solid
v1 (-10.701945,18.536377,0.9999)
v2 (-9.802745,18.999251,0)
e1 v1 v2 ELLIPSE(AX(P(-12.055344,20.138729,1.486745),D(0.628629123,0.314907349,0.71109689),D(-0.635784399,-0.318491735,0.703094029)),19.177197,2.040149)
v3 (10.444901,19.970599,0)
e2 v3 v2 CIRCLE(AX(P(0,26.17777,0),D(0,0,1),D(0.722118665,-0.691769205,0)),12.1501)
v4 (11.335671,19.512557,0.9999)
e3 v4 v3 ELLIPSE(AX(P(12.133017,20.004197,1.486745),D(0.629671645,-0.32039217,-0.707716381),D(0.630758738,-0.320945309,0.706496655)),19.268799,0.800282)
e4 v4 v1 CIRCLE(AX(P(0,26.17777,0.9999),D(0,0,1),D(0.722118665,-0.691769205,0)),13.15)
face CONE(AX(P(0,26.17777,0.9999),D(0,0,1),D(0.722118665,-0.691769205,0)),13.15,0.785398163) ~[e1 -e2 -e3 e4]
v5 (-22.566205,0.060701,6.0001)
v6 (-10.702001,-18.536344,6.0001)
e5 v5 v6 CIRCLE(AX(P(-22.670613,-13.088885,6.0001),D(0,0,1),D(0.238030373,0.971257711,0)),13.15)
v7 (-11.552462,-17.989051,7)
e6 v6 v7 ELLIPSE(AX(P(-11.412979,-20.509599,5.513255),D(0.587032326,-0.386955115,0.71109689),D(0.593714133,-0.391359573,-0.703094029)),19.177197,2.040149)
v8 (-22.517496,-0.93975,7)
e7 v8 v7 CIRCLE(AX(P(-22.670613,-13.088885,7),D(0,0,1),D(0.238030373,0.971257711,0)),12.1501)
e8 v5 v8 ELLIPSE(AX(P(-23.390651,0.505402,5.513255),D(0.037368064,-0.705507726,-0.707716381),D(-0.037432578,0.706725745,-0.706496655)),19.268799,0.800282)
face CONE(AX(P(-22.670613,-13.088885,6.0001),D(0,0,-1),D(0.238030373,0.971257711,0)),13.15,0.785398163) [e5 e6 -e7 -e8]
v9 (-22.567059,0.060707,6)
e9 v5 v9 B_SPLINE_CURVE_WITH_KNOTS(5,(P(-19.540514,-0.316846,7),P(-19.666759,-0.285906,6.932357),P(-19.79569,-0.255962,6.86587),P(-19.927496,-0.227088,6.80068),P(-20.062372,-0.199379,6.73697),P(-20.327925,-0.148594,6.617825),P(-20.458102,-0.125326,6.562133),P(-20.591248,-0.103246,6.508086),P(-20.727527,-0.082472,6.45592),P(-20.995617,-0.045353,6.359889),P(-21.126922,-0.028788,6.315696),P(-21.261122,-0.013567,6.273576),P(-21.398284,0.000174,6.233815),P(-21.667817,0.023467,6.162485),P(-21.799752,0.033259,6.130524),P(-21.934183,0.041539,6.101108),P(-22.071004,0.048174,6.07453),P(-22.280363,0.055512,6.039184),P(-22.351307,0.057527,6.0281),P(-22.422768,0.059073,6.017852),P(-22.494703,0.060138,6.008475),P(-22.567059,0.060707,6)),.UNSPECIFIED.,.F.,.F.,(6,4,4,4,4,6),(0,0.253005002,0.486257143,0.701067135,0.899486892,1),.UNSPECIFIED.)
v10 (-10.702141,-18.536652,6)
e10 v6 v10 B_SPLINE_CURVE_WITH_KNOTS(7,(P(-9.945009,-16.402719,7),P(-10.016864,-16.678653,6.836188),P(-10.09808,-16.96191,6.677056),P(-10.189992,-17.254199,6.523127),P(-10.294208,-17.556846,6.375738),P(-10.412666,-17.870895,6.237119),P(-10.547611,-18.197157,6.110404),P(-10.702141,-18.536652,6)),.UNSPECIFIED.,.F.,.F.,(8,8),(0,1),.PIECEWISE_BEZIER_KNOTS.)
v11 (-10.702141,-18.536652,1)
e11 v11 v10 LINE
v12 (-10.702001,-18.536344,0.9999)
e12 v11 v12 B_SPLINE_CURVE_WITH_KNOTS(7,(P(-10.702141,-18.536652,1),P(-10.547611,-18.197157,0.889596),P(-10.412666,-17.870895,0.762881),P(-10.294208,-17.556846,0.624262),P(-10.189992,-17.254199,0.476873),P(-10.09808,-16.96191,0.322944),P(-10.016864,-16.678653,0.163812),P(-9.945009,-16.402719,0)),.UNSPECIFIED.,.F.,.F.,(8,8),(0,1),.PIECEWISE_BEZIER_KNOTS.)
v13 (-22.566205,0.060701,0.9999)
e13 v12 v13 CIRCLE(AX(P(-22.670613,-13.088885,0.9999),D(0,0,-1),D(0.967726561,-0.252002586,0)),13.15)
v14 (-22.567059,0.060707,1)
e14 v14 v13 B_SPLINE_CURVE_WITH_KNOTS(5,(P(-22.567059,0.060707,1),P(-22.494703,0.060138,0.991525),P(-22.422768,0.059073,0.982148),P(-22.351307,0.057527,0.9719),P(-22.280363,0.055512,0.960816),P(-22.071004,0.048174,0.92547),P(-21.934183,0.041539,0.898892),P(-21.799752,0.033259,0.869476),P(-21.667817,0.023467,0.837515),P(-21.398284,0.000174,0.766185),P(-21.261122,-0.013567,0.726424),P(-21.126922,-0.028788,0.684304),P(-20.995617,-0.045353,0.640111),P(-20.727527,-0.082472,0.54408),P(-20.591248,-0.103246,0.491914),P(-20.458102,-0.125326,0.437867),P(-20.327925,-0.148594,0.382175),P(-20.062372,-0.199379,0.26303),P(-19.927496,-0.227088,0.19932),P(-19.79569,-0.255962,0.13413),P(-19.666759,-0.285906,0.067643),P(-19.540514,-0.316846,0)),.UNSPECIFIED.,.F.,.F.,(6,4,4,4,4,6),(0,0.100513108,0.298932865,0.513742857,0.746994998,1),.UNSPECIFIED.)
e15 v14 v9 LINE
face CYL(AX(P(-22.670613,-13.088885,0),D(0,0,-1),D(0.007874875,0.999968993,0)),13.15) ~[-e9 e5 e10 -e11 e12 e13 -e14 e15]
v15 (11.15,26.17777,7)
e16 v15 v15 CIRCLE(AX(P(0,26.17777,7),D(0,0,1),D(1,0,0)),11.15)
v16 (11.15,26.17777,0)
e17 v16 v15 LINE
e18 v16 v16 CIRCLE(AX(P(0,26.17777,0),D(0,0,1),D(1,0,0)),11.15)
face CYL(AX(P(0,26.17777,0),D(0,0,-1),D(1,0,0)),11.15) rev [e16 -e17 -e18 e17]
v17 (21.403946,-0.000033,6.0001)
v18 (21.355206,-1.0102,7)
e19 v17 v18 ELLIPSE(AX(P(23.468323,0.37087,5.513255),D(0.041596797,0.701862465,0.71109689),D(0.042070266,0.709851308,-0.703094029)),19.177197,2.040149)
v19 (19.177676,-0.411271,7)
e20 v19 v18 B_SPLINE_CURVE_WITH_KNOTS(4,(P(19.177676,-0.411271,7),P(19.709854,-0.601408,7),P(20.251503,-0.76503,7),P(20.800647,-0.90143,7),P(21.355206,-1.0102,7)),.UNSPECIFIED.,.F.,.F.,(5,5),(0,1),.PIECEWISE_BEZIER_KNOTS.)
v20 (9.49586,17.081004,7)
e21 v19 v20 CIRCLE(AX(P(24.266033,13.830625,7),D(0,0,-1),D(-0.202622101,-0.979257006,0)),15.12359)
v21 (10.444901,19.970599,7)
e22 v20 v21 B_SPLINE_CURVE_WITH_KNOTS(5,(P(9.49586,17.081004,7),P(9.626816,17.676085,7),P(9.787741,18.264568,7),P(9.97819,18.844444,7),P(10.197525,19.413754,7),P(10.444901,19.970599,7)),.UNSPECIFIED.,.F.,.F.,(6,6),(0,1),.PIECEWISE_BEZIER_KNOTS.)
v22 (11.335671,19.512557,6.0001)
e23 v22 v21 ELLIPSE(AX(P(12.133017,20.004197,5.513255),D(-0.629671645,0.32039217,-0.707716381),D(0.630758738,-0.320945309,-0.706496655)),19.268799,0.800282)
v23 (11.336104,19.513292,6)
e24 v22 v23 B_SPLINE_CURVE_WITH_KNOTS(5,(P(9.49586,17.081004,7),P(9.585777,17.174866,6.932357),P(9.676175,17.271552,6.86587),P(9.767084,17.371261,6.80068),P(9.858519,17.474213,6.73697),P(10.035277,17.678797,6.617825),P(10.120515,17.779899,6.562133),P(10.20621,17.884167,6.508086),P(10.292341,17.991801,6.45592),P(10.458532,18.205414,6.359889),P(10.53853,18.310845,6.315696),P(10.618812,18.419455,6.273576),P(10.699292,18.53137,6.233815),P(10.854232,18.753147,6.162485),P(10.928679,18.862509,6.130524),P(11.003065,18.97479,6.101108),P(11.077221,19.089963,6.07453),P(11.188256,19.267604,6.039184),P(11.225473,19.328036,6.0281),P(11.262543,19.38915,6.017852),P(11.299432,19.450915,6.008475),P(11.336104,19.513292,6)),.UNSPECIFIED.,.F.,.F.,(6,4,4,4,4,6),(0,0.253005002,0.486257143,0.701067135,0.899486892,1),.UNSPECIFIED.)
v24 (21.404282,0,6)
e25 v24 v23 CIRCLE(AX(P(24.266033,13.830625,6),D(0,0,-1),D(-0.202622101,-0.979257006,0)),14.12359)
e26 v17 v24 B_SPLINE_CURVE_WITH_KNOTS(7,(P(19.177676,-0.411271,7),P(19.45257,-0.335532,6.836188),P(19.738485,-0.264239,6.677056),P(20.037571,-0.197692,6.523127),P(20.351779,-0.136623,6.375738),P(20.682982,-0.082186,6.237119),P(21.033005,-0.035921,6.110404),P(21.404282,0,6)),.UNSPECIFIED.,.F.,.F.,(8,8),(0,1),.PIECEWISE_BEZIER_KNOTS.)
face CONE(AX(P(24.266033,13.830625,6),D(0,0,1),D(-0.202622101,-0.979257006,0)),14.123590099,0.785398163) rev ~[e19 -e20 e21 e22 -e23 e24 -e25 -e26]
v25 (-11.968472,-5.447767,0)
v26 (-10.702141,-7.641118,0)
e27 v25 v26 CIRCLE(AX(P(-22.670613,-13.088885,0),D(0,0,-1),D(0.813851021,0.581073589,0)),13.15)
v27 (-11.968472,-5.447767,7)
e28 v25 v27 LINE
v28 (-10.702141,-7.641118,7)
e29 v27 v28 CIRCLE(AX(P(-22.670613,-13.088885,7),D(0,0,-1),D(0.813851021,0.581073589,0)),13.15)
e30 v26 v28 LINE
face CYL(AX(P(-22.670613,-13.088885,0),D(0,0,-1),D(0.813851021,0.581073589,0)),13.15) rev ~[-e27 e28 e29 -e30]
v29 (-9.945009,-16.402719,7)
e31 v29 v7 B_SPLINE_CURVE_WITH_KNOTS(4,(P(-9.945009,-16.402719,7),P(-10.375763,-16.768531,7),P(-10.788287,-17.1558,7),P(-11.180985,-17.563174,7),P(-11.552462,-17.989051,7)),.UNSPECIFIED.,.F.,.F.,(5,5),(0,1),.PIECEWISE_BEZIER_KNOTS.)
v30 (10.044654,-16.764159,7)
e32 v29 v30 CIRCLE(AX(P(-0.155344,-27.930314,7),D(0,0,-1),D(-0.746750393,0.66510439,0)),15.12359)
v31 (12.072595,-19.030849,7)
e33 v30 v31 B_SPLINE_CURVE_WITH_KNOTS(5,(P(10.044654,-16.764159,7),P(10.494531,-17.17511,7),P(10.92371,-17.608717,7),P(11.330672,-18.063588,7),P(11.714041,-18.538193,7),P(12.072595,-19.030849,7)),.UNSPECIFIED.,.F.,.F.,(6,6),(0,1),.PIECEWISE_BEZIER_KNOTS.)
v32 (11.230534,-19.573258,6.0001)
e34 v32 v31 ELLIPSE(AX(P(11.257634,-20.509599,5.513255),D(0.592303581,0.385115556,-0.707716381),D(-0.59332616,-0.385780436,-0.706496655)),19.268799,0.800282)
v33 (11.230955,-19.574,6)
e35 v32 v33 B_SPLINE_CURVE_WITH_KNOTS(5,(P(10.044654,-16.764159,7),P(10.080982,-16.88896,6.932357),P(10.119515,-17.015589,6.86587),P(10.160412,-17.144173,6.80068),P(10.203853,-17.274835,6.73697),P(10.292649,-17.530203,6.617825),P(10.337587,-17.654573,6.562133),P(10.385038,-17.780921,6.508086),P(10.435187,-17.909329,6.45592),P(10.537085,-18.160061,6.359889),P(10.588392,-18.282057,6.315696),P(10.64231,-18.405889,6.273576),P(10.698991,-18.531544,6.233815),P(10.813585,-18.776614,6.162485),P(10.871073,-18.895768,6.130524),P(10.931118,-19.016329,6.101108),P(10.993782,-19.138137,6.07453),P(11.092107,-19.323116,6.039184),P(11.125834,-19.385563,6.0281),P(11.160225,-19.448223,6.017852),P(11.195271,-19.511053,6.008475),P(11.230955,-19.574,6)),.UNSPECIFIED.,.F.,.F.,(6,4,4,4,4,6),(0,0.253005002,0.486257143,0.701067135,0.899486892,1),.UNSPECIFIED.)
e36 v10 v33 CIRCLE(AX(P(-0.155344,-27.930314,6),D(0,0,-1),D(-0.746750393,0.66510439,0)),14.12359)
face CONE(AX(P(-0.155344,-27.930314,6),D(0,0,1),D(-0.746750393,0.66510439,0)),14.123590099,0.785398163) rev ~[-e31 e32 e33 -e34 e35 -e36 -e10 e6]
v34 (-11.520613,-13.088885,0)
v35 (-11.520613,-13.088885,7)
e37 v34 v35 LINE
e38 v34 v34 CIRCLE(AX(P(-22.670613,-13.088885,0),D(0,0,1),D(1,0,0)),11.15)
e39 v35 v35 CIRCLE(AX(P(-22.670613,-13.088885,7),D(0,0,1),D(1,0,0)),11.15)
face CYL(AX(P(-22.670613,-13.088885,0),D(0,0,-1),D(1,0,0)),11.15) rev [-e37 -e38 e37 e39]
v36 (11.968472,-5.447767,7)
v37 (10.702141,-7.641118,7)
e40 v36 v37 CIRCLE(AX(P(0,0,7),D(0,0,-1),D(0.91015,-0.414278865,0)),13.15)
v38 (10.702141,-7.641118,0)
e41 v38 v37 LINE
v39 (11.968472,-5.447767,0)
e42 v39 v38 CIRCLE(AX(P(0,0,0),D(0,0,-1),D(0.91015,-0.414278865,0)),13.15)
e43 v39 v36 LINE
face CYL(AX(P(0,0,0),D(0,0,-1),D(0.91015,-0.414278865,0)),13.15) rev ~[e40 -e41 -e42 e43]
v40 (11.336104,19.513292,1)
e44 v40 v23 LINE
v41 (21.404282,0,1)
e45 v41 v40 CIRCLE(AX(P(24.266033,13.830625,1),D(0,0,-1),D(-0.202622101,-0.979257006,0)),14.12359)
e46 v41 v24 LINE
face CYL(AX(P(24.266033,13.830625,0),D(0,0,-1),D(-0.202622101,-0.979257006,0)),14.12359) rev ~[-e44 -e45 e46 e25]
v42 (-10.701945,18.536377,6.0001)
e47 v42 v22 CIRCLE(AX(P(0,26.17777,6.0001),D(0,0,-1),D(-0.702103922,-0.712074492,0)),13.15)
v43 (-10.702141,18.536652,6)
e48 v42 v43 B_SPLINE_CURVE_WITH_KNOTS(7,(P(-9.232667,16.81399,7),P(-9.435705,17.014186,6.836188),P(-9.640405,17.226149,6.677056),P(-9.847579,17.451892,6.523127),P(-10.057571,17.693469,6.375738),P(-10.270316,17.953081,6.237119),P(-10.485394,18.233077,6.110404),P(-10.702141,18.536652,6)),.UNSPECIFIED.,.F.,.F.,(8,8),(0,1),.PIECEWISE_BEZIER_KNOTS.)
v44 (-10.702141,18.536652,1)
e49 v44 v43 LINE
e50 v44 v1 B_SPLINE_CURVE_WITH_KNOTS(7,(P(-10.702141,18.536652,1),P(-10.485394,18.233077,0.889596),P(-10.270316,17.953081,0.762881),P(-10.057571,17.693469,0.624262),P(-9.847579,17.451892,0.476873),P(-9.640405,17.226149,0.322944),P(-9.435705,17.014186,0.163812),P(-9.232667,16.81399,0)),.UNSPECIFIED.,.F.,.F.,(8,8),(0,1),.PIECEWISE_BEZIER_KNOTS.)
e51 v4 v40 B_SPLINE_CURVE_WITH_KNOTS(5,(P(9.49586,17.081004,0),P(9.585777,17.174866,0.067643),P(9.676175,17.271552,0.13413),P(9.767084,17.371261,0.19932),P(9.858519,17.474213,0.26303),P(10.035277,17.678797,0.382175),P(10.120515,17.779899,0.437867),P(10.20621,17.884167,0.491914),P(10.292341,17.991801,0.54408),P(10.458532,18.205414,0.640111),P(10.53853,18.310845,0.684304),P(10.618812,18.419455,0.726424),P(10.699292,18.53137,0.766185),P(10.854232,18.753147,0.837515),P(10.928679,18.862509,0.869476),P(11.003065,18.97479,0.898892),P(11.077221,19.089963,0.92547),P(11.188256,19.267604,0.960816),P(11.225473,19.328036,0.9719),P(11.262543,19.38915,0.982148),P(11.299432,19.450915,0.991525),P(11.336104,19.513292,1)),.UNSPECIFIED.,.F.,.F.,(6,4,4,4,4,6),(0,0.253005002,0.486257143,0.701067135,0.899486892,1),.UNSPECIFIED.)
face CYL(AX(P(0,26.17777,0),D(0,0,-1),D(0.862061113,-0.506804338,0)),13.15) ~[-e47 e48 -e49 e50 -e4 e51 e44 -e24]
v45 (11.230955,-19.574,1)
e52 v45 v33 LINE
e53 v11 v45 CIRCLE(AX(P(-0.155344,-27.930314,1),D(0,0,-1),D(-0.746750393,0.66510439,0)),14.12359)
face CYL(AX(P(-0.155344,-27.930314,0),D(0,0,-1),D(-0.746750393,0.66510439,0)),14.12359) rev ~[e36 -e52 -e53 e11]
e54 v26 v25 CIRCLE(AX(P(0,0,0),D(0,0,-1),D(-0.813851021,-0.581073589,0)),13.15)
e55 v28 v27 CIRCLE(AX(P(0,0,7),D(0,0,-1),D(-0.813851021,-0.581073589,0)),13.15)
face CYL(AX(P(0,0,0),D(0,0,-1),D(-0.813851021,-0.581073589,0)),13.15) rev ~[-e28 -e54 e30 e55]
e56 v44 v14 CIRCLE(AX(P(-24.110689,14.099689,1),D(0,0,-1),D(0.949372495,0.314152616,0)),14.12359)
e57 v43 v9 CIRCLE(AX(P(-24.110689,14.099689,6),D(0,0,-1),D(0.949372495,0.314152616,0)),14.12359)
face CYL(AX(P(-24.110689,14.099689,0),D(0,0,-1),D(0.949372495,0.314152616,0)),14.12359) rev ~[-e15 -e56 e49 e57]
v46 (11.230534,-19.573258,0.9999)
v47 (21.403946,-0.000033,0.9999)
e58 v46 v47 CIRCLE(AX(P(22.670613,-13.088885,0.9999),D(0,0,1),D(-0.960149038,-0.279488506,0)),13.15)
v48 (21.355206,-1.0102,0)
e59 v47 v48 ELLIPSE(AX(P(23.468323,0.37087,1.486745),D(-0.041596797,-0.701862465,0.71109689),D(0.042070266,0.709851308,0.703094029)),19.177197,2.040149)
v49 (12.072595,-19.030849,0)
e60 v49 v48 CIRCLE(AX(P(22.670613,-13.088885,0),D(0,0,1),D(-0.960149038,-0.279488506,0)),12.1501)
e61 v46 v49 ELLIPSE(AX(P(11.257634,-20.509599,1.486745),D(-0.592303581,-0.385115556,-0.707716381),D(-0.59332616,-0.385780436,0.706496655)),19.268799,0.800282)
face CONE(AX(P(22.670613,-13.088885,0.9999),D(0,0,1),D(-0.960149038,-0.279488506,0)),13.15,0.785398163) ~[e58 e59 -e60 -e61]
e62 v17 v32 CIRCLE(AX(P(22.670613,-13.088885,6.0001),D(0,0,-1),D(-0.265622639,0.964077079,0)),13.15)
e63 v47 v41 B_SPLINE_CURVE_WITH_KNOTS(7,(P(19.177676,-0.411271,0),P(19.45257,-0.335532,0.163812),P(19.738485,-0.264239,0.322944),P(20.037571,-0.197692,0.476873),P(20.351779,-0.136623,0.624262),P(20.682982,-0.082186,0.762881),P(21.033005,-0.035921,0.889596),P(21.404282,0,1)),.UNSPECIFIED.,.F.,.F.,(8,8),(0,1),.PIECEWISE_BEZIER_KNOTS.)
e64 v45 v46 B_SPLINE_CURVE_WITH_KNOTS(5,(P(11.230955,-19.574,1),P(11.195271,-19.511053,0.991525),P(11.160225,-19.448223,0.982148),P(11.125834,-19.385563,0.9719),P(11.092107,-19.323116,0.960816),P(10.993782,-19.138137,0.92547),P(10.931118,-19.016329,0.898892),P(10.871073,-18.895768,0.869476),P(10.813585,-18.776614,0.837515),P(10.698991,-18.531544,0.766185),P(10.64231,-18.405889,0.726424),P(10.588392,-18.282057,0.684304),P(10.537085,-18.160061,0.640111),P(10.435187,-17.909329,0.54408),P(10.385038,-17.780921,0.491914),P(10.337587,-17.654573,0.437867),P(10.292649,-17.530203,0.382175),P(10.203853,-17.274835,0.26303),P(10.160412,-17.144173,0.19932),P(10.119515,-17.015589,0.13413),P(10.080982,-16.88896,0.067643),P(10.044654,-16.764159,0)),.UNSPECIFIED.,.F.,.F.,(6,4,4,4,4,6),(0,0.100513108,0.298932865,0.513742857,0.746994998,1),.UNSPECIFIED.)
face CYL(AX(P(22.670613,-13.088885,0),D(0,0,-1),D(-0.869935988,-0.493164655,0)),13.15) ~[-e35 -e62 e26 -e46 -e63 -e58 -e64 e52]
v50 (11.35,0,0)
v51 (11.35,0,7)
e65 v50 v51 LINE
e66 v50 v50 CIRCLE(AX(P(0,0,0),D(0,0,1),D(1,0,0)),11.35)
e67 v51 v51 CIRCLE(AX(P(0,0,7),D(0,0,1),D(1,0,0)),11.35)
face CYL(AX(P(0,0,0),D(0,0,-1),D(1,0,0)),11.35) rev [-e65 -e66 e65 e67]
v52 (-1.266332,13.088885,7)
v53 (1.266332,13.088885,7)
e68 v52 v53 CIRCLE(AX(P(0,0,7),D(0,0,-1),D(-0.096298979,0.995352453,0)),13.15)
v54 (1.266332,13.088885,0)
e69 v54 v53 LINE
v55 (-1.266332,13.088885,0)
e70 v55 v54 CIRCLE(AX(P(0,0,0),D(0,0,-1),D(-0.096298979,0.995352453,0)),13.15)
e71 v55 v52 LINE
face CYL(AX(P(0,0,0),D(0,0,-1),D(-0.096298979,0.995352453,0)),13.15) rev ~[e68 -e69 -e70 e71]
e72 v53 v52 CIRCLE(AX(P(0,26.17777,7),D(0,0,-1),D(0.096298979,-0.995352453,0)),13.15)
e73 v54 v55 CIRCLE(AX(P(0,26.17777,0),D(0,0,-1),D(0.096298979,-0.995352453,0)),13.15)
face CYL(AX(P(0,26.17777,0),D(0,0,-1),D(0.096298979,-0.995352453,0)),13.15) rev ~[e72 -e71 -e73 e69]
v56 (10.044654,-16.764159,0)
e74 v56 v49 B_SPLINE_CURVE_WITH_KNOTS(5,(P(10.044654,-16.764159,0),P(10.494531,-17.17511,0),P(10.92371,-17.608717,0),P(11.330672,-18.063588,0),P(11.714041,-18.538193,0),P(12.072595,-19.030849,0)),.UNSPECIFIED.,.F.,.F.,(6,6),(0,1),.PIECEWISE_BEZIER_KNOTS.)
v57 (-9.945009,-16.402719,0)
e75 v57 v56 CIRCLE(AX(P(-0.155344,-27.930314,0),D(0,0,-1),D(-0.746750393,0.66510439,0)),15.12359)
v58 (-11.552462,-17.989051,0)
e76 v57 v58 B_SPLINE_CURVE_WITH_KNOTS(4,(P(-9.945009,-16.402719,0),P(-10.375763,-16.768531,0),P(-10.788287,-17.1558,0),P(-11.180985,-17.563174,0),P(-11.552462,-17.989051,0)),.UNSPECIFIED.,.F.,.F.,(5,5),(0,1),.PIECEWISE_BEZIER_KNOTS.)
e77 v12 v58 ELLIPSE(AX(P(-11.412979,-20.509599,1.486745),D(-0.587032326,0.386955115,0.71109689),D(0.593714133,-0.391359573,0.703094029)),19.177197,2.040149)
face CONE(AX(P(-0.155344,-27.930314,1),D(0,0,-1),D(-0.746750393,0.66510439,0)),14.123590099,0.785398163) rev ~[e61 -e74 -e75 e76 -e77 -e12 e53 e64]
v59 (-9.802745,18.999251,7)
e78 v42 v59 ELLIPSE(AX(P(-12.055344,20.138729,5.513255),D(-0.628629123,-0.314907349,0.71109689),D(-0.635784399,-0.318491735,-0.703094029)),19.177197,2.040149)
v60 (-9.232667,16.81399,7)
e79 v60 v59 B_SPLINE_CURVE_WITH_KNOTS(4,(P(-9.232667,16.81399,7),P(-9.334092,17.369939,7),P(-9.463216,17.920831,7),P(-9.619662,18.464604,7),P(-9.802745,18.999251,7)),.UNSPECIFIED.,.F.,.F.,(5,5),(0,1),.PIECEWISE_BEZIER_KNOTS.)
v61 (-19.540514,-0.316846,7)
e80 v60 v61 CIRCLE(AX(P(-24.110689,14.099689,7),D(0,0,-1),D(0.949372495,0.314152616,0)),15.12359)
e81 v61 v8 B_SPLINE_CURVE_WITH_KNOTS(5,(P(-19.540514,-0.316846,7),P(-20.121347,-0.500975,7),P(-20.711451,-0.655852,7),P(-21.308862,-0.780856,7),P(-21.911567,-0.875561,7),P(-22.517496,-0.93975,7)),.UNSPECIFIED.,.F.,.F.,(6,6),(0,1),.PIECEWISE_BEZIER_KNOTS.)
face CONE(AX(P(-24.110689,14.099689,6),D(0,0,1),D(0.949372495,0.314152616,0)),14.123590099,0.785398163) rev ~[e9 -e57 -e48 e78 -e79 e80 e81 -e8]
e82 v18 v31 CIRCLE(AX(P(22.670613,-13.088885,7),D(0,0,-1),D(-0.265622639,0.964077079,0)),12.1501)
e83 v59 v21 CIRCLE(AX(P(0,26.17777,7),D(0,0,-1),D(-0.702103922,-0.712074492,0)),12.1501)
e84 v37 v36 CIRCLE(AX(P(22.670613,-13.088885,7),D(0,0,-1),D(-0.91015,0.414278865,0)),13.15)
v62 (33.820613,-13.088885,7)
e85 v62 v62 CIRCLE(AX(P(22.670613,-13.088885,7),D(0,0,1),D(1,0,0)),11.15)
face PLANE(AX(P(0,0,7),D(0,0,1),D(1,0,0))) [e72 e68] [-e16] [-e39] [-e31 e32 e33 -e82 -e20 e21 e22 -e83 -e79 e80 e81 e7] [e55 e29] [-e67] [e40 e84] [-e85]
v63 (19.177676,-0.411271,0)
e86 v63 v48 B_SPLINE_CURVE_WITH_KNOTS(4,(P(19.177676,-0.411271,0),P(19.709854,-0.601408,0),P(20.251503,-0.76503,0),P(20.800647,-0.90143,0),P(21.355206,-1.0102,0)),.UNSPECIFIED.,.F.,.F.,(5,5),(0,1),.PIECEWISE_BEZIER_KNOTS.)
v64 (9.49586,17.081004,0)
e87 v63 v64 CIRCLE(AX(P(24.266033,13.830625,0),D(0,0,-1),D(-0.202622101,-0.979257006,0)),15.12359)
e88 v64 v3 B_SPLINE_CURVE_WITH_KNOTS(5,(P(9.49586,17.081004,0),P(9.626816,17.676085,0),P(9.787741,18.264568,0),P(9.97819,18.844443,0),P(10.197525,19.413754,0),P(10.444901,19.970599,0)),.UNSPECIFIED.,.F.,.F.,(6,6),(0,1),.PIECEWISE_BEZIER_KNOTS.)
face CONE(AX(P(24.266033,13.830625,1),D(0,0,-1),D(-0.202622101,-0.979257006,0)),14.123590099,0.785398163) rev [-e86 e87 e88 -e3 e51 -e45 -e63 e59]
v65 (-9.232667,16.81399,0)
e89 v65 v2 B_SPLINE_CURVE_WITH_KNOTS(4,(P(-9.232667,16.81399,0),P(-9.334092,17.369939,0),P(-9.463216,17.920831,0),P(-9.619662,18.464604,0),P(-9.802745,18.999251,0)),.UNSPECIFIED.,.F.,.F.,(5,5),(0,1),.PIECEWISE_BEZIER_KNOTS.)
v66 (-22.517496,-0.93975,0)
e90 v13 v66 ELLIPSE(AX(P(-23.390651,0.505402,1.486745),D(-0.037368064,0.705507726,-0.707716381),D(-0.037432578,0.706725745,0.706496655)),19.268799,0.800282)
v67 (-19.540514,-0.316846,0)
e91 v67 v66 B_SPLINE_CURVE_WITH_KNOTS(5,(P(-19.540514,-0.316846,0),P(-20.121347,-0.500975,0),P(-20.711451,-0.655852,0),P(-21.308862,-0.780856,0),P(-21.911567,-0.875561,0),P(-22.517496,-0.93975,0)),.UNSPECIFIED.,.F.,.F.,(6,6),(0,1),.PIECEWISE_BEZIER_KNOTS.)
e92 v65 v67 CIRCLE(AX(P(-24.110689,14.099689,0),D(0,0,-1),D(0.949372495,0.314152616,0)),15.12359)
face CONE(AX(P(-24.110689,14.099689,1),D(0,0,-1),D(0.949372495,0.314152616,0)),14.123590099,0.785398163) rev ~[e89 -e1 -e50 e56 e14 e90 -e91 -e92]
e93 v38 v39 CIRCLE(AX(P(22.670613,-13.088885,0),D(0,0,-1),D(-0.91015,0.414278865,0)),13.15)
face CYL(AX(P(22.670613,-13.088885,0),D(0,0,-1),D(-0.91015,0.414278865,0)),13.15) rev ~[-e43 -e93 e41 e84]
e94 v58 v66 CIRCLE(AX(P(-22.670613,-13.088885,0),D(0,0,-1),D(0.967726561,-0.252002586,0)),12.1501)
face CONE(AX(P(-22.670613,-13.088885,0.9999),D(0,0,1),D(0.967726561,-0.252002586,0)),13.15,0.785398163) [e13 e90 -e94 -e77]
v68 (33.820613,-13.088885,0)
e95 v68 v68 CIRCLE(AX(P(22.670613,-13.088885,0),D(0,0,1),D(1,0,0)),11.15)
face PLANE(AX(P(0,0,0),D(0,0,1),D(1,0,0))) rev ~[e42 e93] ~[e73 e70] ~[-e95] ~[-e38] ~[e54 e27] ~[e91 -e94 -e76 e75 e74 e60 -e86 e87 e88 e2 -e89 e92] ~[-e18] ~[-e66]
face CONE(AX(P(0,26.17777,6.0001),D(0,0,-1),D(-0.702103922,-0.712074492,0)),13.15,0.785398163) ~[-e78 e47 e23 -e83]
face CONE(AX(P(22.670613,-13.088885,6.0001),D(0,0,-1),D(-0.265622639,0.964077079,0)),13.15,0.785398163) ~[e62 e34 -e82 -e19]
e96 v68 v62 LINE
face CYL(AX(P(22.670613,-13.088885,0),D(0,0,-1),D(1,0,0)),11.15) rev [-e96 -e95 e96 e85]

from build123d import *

# Parameters (mm, degrees)
F0_R        = 11.15
F0_R_2      = 11.35
F1_DEPTH    = 7
F2_C1_SIZE  = 1
F2_C2_SIZE  = 1
F2_C3_SIZE  = 1
F2_C4_SIZE  = 1
F2_C5_SIZE  = 1
F2_C6_SIZE  = 1
F2_C7_SIZE  = 0.9999
F2_C8_SIZE  = 0.9999
F2_C9_SIZE  = 0.9999
F2_C10_SIZE = 0.9999
F2_C11_SIZE = 0.9999
F2_C12_SIZE = 0.9999


# Not quite as in the source:
# - a fillet or chamfer is up to 0.001 mm smaller than in the source, because OpenCascade refuses the exact size


with BuildPart() as f1:
    # F0 (on Top) → F1 (new body)
    with BuildSketch(Plane.XY):
        with BuildLine():
            ThreePointArc((21.4042818528, 0), (11.7146810466, 7.3545646083), (11.3361036393, 19.5132924821))
            ThreePointArc((11.3361036393, 19.5132924821), (-0.5821803149, 39.3148759845), (-10.7021409264, 18.5366518343))
            ThreePointArc((-10.7021409264, 18.5366518343), (-12.2265803079, 6.4679290794), (-22.5670588206, 0.0607074905))
            ThreePointArc((-22.5670588206, 0.0607074905), (-33.7565911918, -20.1616209346), (-10.7021409264, -18.5366518343))
            ThreePointArc((-10.7021409264, -18.5366518343), (0.5118992613, -13.8224936877), (11.2309551813, -19.5739999726))
            ThreePointArc((11.2309551813, -19.5739999726), (34.3387715067, -19.15325505), (21.4042818528, 0))
        make_face()
        with Locations((-22.6706134247, -13.0888847634)):
            Circle(F0_R, mode=Mode.SUBTRACT)
        with BuildLine():
            ThreePointArc((-11.9684724983, -5.4477670709), (-11.2823793649, -6.5138847634), (-10.7021409264, -7.6411176926))
            ThreePointArc((-10.7021409264, -7.6411176926), (-11.3882340598, -6.575), (-11.9684724983, -5.4477670709))
        make_face(mode=Mode.SUBTRACT)
        with Locations((22.6706134247, -13.0888847634)):
            Circle(F0_R, mode=Mode.SUBTRACT)
        with BuildLine():
            ThreePointArc((11.9684724983, -5.4477670709), (11.3882340598, -6.575), (10.7021409264, -7.6411176926))
            ThreePointArc((10.7021409264, -7.6411176926), (11.2823793649, -6.5138847634), (11.9684724983, -5.4477670709))
        make_face(mode=Mode.SUBTRACT)
        Circle(F0_R_2, mode=Mode.SUBTRACT)
        with BuildLine():
            ThreePointArc((-1.2663315719, 13.0888847634), (0, 13.15), (1.2663315719, 13.0888847634))
            ThreePointArc((1.2663315719, 13.0888847634), (0, 13.0277695268), (-1.2663315719, 13.0888847634))
        make_face(mode=Mode.SUBTRACT)
        with Locations((0, 26.1777695268)):
            Circle(F0_R, mode=Mode.SUBTRACT)
    extrude(amount=F1_DEPTH)

    # F2: chamfer of 1 on 12 edges, made by hand

    # F2_c1
    f2_c1_edges = [f1.edges().sort_by_distance(p)[0] for p in [
        (0.5118992613, -13.8224936877, 0),
    ]]
    chamfer(f2_c1_edges, length=F2_C1_SIZE)

    # F2_c2
    f2_c2_edges = [f1.edges().sort_by_distance(p)[0] for p in [
        (0.5118992613, -13.8224936877, 7),
    ]]
    chamfer(f2_c2_edges, length=F2_C2_SIZE)

    # F2_c3
    f2_c3_edges = [f1.edges().sort_by_distance(p)[0] for p in [
        (11.7146810466, 7.3545646083, 0),
    ]]
    chamfer(f2_c3_edges, length=F2_C3_SIZE)

    # F2_c4
    f2_c4_edges = [f1.edges().sort_by_distance(p)[0] for p in [
        (11.7146810466, 7.3545646083, 7),
    ]]
    chamfer(f2_c4_edges, length=F2_C4_SIZE)

    # F2_c5
    f2_c5_edges = [f1.edges().sort_by_distance(p)[0] for p in [
        (-12.2265803079, 6.4679290794, 0),
    ]]
    chamfer(f2_c5_edges, length=F2_C5_SIZE)

    # F2_c6
    f2_c6_edges = [f1.edges().sort_by_distance(p)[0] for p in [
        (-12.2265803079, 6.4679290794, 7),
    ]]
    chamfer(f2_c6_edges, length=F2_C6_SIZE)

    # F2_c7 (size 1 in the source; OpenCascade refuses exactly that, so slightly less here)
    f2_c7_edges = [f1.edges().sort_by_distance(p)[0] for p in [
        (-33.7565911918, -20.1616209346, 0),
    ]]
    chamfer(f2_c7_edges, length=F2_C7_SIZE)

    # F2_c8 (size 1 in the source; OpenCascade refuses exactly that, so slightly less here)
    f2_c8_edges = [f1.edges().sort_by_distance(p)[0] for p in [
        (-33.7565911918, -20.1616209346, 7),
    ]]
    chamfer(f2_c8_edges, length=F2_C8_SIZE)

    # F2_c9 (size 1 in the source; OpenCascade refuses exactly that, so slightly less here)
    f2_c9_edges = [f1.edges().sort_by_distance(p)[0] for p in [
        (34.3387715067, -19.15325505, 0),
    ]]
    chamfer(f2_c9_edges, length=F2_C9_SIZE)

    # F2_c10 (size 1 in the source; OpenCascade refuses exactly that, so slightly less here)
    f2_c10_edges = [f1.edges().sort_by_distance(p)[0] for p in [
        (34.3387715067, -19.15325505, 7),
    ]]
    chamfer(f2_c10_edges, length=F2_C10_SIZE)

    # F2_c11 (size 1 in the source; OpenCascade refuses exactly that, so slightly less here)
    f2_c11_edges = [f1.edges().sort_by_distance(p)[0] for p in [
        (-0.5821803149, 39.3148759845, 0),
    ]]
    chamfer(f2_c11_edges, length=F2_C11_SIZE)

    # F2_c12 (size 1 in the source; OpenCascade refuses exactly that, so slightly less here)
    f2_c12_edges = [f1.edges().sort_by_distance(p)[0] for p in [
        (-0.5821803149, 39.3148759845, 7),
    ]]
    chamfer(f2_c12_edges, length=F2_C12_SIZE)


solid = f1.part
